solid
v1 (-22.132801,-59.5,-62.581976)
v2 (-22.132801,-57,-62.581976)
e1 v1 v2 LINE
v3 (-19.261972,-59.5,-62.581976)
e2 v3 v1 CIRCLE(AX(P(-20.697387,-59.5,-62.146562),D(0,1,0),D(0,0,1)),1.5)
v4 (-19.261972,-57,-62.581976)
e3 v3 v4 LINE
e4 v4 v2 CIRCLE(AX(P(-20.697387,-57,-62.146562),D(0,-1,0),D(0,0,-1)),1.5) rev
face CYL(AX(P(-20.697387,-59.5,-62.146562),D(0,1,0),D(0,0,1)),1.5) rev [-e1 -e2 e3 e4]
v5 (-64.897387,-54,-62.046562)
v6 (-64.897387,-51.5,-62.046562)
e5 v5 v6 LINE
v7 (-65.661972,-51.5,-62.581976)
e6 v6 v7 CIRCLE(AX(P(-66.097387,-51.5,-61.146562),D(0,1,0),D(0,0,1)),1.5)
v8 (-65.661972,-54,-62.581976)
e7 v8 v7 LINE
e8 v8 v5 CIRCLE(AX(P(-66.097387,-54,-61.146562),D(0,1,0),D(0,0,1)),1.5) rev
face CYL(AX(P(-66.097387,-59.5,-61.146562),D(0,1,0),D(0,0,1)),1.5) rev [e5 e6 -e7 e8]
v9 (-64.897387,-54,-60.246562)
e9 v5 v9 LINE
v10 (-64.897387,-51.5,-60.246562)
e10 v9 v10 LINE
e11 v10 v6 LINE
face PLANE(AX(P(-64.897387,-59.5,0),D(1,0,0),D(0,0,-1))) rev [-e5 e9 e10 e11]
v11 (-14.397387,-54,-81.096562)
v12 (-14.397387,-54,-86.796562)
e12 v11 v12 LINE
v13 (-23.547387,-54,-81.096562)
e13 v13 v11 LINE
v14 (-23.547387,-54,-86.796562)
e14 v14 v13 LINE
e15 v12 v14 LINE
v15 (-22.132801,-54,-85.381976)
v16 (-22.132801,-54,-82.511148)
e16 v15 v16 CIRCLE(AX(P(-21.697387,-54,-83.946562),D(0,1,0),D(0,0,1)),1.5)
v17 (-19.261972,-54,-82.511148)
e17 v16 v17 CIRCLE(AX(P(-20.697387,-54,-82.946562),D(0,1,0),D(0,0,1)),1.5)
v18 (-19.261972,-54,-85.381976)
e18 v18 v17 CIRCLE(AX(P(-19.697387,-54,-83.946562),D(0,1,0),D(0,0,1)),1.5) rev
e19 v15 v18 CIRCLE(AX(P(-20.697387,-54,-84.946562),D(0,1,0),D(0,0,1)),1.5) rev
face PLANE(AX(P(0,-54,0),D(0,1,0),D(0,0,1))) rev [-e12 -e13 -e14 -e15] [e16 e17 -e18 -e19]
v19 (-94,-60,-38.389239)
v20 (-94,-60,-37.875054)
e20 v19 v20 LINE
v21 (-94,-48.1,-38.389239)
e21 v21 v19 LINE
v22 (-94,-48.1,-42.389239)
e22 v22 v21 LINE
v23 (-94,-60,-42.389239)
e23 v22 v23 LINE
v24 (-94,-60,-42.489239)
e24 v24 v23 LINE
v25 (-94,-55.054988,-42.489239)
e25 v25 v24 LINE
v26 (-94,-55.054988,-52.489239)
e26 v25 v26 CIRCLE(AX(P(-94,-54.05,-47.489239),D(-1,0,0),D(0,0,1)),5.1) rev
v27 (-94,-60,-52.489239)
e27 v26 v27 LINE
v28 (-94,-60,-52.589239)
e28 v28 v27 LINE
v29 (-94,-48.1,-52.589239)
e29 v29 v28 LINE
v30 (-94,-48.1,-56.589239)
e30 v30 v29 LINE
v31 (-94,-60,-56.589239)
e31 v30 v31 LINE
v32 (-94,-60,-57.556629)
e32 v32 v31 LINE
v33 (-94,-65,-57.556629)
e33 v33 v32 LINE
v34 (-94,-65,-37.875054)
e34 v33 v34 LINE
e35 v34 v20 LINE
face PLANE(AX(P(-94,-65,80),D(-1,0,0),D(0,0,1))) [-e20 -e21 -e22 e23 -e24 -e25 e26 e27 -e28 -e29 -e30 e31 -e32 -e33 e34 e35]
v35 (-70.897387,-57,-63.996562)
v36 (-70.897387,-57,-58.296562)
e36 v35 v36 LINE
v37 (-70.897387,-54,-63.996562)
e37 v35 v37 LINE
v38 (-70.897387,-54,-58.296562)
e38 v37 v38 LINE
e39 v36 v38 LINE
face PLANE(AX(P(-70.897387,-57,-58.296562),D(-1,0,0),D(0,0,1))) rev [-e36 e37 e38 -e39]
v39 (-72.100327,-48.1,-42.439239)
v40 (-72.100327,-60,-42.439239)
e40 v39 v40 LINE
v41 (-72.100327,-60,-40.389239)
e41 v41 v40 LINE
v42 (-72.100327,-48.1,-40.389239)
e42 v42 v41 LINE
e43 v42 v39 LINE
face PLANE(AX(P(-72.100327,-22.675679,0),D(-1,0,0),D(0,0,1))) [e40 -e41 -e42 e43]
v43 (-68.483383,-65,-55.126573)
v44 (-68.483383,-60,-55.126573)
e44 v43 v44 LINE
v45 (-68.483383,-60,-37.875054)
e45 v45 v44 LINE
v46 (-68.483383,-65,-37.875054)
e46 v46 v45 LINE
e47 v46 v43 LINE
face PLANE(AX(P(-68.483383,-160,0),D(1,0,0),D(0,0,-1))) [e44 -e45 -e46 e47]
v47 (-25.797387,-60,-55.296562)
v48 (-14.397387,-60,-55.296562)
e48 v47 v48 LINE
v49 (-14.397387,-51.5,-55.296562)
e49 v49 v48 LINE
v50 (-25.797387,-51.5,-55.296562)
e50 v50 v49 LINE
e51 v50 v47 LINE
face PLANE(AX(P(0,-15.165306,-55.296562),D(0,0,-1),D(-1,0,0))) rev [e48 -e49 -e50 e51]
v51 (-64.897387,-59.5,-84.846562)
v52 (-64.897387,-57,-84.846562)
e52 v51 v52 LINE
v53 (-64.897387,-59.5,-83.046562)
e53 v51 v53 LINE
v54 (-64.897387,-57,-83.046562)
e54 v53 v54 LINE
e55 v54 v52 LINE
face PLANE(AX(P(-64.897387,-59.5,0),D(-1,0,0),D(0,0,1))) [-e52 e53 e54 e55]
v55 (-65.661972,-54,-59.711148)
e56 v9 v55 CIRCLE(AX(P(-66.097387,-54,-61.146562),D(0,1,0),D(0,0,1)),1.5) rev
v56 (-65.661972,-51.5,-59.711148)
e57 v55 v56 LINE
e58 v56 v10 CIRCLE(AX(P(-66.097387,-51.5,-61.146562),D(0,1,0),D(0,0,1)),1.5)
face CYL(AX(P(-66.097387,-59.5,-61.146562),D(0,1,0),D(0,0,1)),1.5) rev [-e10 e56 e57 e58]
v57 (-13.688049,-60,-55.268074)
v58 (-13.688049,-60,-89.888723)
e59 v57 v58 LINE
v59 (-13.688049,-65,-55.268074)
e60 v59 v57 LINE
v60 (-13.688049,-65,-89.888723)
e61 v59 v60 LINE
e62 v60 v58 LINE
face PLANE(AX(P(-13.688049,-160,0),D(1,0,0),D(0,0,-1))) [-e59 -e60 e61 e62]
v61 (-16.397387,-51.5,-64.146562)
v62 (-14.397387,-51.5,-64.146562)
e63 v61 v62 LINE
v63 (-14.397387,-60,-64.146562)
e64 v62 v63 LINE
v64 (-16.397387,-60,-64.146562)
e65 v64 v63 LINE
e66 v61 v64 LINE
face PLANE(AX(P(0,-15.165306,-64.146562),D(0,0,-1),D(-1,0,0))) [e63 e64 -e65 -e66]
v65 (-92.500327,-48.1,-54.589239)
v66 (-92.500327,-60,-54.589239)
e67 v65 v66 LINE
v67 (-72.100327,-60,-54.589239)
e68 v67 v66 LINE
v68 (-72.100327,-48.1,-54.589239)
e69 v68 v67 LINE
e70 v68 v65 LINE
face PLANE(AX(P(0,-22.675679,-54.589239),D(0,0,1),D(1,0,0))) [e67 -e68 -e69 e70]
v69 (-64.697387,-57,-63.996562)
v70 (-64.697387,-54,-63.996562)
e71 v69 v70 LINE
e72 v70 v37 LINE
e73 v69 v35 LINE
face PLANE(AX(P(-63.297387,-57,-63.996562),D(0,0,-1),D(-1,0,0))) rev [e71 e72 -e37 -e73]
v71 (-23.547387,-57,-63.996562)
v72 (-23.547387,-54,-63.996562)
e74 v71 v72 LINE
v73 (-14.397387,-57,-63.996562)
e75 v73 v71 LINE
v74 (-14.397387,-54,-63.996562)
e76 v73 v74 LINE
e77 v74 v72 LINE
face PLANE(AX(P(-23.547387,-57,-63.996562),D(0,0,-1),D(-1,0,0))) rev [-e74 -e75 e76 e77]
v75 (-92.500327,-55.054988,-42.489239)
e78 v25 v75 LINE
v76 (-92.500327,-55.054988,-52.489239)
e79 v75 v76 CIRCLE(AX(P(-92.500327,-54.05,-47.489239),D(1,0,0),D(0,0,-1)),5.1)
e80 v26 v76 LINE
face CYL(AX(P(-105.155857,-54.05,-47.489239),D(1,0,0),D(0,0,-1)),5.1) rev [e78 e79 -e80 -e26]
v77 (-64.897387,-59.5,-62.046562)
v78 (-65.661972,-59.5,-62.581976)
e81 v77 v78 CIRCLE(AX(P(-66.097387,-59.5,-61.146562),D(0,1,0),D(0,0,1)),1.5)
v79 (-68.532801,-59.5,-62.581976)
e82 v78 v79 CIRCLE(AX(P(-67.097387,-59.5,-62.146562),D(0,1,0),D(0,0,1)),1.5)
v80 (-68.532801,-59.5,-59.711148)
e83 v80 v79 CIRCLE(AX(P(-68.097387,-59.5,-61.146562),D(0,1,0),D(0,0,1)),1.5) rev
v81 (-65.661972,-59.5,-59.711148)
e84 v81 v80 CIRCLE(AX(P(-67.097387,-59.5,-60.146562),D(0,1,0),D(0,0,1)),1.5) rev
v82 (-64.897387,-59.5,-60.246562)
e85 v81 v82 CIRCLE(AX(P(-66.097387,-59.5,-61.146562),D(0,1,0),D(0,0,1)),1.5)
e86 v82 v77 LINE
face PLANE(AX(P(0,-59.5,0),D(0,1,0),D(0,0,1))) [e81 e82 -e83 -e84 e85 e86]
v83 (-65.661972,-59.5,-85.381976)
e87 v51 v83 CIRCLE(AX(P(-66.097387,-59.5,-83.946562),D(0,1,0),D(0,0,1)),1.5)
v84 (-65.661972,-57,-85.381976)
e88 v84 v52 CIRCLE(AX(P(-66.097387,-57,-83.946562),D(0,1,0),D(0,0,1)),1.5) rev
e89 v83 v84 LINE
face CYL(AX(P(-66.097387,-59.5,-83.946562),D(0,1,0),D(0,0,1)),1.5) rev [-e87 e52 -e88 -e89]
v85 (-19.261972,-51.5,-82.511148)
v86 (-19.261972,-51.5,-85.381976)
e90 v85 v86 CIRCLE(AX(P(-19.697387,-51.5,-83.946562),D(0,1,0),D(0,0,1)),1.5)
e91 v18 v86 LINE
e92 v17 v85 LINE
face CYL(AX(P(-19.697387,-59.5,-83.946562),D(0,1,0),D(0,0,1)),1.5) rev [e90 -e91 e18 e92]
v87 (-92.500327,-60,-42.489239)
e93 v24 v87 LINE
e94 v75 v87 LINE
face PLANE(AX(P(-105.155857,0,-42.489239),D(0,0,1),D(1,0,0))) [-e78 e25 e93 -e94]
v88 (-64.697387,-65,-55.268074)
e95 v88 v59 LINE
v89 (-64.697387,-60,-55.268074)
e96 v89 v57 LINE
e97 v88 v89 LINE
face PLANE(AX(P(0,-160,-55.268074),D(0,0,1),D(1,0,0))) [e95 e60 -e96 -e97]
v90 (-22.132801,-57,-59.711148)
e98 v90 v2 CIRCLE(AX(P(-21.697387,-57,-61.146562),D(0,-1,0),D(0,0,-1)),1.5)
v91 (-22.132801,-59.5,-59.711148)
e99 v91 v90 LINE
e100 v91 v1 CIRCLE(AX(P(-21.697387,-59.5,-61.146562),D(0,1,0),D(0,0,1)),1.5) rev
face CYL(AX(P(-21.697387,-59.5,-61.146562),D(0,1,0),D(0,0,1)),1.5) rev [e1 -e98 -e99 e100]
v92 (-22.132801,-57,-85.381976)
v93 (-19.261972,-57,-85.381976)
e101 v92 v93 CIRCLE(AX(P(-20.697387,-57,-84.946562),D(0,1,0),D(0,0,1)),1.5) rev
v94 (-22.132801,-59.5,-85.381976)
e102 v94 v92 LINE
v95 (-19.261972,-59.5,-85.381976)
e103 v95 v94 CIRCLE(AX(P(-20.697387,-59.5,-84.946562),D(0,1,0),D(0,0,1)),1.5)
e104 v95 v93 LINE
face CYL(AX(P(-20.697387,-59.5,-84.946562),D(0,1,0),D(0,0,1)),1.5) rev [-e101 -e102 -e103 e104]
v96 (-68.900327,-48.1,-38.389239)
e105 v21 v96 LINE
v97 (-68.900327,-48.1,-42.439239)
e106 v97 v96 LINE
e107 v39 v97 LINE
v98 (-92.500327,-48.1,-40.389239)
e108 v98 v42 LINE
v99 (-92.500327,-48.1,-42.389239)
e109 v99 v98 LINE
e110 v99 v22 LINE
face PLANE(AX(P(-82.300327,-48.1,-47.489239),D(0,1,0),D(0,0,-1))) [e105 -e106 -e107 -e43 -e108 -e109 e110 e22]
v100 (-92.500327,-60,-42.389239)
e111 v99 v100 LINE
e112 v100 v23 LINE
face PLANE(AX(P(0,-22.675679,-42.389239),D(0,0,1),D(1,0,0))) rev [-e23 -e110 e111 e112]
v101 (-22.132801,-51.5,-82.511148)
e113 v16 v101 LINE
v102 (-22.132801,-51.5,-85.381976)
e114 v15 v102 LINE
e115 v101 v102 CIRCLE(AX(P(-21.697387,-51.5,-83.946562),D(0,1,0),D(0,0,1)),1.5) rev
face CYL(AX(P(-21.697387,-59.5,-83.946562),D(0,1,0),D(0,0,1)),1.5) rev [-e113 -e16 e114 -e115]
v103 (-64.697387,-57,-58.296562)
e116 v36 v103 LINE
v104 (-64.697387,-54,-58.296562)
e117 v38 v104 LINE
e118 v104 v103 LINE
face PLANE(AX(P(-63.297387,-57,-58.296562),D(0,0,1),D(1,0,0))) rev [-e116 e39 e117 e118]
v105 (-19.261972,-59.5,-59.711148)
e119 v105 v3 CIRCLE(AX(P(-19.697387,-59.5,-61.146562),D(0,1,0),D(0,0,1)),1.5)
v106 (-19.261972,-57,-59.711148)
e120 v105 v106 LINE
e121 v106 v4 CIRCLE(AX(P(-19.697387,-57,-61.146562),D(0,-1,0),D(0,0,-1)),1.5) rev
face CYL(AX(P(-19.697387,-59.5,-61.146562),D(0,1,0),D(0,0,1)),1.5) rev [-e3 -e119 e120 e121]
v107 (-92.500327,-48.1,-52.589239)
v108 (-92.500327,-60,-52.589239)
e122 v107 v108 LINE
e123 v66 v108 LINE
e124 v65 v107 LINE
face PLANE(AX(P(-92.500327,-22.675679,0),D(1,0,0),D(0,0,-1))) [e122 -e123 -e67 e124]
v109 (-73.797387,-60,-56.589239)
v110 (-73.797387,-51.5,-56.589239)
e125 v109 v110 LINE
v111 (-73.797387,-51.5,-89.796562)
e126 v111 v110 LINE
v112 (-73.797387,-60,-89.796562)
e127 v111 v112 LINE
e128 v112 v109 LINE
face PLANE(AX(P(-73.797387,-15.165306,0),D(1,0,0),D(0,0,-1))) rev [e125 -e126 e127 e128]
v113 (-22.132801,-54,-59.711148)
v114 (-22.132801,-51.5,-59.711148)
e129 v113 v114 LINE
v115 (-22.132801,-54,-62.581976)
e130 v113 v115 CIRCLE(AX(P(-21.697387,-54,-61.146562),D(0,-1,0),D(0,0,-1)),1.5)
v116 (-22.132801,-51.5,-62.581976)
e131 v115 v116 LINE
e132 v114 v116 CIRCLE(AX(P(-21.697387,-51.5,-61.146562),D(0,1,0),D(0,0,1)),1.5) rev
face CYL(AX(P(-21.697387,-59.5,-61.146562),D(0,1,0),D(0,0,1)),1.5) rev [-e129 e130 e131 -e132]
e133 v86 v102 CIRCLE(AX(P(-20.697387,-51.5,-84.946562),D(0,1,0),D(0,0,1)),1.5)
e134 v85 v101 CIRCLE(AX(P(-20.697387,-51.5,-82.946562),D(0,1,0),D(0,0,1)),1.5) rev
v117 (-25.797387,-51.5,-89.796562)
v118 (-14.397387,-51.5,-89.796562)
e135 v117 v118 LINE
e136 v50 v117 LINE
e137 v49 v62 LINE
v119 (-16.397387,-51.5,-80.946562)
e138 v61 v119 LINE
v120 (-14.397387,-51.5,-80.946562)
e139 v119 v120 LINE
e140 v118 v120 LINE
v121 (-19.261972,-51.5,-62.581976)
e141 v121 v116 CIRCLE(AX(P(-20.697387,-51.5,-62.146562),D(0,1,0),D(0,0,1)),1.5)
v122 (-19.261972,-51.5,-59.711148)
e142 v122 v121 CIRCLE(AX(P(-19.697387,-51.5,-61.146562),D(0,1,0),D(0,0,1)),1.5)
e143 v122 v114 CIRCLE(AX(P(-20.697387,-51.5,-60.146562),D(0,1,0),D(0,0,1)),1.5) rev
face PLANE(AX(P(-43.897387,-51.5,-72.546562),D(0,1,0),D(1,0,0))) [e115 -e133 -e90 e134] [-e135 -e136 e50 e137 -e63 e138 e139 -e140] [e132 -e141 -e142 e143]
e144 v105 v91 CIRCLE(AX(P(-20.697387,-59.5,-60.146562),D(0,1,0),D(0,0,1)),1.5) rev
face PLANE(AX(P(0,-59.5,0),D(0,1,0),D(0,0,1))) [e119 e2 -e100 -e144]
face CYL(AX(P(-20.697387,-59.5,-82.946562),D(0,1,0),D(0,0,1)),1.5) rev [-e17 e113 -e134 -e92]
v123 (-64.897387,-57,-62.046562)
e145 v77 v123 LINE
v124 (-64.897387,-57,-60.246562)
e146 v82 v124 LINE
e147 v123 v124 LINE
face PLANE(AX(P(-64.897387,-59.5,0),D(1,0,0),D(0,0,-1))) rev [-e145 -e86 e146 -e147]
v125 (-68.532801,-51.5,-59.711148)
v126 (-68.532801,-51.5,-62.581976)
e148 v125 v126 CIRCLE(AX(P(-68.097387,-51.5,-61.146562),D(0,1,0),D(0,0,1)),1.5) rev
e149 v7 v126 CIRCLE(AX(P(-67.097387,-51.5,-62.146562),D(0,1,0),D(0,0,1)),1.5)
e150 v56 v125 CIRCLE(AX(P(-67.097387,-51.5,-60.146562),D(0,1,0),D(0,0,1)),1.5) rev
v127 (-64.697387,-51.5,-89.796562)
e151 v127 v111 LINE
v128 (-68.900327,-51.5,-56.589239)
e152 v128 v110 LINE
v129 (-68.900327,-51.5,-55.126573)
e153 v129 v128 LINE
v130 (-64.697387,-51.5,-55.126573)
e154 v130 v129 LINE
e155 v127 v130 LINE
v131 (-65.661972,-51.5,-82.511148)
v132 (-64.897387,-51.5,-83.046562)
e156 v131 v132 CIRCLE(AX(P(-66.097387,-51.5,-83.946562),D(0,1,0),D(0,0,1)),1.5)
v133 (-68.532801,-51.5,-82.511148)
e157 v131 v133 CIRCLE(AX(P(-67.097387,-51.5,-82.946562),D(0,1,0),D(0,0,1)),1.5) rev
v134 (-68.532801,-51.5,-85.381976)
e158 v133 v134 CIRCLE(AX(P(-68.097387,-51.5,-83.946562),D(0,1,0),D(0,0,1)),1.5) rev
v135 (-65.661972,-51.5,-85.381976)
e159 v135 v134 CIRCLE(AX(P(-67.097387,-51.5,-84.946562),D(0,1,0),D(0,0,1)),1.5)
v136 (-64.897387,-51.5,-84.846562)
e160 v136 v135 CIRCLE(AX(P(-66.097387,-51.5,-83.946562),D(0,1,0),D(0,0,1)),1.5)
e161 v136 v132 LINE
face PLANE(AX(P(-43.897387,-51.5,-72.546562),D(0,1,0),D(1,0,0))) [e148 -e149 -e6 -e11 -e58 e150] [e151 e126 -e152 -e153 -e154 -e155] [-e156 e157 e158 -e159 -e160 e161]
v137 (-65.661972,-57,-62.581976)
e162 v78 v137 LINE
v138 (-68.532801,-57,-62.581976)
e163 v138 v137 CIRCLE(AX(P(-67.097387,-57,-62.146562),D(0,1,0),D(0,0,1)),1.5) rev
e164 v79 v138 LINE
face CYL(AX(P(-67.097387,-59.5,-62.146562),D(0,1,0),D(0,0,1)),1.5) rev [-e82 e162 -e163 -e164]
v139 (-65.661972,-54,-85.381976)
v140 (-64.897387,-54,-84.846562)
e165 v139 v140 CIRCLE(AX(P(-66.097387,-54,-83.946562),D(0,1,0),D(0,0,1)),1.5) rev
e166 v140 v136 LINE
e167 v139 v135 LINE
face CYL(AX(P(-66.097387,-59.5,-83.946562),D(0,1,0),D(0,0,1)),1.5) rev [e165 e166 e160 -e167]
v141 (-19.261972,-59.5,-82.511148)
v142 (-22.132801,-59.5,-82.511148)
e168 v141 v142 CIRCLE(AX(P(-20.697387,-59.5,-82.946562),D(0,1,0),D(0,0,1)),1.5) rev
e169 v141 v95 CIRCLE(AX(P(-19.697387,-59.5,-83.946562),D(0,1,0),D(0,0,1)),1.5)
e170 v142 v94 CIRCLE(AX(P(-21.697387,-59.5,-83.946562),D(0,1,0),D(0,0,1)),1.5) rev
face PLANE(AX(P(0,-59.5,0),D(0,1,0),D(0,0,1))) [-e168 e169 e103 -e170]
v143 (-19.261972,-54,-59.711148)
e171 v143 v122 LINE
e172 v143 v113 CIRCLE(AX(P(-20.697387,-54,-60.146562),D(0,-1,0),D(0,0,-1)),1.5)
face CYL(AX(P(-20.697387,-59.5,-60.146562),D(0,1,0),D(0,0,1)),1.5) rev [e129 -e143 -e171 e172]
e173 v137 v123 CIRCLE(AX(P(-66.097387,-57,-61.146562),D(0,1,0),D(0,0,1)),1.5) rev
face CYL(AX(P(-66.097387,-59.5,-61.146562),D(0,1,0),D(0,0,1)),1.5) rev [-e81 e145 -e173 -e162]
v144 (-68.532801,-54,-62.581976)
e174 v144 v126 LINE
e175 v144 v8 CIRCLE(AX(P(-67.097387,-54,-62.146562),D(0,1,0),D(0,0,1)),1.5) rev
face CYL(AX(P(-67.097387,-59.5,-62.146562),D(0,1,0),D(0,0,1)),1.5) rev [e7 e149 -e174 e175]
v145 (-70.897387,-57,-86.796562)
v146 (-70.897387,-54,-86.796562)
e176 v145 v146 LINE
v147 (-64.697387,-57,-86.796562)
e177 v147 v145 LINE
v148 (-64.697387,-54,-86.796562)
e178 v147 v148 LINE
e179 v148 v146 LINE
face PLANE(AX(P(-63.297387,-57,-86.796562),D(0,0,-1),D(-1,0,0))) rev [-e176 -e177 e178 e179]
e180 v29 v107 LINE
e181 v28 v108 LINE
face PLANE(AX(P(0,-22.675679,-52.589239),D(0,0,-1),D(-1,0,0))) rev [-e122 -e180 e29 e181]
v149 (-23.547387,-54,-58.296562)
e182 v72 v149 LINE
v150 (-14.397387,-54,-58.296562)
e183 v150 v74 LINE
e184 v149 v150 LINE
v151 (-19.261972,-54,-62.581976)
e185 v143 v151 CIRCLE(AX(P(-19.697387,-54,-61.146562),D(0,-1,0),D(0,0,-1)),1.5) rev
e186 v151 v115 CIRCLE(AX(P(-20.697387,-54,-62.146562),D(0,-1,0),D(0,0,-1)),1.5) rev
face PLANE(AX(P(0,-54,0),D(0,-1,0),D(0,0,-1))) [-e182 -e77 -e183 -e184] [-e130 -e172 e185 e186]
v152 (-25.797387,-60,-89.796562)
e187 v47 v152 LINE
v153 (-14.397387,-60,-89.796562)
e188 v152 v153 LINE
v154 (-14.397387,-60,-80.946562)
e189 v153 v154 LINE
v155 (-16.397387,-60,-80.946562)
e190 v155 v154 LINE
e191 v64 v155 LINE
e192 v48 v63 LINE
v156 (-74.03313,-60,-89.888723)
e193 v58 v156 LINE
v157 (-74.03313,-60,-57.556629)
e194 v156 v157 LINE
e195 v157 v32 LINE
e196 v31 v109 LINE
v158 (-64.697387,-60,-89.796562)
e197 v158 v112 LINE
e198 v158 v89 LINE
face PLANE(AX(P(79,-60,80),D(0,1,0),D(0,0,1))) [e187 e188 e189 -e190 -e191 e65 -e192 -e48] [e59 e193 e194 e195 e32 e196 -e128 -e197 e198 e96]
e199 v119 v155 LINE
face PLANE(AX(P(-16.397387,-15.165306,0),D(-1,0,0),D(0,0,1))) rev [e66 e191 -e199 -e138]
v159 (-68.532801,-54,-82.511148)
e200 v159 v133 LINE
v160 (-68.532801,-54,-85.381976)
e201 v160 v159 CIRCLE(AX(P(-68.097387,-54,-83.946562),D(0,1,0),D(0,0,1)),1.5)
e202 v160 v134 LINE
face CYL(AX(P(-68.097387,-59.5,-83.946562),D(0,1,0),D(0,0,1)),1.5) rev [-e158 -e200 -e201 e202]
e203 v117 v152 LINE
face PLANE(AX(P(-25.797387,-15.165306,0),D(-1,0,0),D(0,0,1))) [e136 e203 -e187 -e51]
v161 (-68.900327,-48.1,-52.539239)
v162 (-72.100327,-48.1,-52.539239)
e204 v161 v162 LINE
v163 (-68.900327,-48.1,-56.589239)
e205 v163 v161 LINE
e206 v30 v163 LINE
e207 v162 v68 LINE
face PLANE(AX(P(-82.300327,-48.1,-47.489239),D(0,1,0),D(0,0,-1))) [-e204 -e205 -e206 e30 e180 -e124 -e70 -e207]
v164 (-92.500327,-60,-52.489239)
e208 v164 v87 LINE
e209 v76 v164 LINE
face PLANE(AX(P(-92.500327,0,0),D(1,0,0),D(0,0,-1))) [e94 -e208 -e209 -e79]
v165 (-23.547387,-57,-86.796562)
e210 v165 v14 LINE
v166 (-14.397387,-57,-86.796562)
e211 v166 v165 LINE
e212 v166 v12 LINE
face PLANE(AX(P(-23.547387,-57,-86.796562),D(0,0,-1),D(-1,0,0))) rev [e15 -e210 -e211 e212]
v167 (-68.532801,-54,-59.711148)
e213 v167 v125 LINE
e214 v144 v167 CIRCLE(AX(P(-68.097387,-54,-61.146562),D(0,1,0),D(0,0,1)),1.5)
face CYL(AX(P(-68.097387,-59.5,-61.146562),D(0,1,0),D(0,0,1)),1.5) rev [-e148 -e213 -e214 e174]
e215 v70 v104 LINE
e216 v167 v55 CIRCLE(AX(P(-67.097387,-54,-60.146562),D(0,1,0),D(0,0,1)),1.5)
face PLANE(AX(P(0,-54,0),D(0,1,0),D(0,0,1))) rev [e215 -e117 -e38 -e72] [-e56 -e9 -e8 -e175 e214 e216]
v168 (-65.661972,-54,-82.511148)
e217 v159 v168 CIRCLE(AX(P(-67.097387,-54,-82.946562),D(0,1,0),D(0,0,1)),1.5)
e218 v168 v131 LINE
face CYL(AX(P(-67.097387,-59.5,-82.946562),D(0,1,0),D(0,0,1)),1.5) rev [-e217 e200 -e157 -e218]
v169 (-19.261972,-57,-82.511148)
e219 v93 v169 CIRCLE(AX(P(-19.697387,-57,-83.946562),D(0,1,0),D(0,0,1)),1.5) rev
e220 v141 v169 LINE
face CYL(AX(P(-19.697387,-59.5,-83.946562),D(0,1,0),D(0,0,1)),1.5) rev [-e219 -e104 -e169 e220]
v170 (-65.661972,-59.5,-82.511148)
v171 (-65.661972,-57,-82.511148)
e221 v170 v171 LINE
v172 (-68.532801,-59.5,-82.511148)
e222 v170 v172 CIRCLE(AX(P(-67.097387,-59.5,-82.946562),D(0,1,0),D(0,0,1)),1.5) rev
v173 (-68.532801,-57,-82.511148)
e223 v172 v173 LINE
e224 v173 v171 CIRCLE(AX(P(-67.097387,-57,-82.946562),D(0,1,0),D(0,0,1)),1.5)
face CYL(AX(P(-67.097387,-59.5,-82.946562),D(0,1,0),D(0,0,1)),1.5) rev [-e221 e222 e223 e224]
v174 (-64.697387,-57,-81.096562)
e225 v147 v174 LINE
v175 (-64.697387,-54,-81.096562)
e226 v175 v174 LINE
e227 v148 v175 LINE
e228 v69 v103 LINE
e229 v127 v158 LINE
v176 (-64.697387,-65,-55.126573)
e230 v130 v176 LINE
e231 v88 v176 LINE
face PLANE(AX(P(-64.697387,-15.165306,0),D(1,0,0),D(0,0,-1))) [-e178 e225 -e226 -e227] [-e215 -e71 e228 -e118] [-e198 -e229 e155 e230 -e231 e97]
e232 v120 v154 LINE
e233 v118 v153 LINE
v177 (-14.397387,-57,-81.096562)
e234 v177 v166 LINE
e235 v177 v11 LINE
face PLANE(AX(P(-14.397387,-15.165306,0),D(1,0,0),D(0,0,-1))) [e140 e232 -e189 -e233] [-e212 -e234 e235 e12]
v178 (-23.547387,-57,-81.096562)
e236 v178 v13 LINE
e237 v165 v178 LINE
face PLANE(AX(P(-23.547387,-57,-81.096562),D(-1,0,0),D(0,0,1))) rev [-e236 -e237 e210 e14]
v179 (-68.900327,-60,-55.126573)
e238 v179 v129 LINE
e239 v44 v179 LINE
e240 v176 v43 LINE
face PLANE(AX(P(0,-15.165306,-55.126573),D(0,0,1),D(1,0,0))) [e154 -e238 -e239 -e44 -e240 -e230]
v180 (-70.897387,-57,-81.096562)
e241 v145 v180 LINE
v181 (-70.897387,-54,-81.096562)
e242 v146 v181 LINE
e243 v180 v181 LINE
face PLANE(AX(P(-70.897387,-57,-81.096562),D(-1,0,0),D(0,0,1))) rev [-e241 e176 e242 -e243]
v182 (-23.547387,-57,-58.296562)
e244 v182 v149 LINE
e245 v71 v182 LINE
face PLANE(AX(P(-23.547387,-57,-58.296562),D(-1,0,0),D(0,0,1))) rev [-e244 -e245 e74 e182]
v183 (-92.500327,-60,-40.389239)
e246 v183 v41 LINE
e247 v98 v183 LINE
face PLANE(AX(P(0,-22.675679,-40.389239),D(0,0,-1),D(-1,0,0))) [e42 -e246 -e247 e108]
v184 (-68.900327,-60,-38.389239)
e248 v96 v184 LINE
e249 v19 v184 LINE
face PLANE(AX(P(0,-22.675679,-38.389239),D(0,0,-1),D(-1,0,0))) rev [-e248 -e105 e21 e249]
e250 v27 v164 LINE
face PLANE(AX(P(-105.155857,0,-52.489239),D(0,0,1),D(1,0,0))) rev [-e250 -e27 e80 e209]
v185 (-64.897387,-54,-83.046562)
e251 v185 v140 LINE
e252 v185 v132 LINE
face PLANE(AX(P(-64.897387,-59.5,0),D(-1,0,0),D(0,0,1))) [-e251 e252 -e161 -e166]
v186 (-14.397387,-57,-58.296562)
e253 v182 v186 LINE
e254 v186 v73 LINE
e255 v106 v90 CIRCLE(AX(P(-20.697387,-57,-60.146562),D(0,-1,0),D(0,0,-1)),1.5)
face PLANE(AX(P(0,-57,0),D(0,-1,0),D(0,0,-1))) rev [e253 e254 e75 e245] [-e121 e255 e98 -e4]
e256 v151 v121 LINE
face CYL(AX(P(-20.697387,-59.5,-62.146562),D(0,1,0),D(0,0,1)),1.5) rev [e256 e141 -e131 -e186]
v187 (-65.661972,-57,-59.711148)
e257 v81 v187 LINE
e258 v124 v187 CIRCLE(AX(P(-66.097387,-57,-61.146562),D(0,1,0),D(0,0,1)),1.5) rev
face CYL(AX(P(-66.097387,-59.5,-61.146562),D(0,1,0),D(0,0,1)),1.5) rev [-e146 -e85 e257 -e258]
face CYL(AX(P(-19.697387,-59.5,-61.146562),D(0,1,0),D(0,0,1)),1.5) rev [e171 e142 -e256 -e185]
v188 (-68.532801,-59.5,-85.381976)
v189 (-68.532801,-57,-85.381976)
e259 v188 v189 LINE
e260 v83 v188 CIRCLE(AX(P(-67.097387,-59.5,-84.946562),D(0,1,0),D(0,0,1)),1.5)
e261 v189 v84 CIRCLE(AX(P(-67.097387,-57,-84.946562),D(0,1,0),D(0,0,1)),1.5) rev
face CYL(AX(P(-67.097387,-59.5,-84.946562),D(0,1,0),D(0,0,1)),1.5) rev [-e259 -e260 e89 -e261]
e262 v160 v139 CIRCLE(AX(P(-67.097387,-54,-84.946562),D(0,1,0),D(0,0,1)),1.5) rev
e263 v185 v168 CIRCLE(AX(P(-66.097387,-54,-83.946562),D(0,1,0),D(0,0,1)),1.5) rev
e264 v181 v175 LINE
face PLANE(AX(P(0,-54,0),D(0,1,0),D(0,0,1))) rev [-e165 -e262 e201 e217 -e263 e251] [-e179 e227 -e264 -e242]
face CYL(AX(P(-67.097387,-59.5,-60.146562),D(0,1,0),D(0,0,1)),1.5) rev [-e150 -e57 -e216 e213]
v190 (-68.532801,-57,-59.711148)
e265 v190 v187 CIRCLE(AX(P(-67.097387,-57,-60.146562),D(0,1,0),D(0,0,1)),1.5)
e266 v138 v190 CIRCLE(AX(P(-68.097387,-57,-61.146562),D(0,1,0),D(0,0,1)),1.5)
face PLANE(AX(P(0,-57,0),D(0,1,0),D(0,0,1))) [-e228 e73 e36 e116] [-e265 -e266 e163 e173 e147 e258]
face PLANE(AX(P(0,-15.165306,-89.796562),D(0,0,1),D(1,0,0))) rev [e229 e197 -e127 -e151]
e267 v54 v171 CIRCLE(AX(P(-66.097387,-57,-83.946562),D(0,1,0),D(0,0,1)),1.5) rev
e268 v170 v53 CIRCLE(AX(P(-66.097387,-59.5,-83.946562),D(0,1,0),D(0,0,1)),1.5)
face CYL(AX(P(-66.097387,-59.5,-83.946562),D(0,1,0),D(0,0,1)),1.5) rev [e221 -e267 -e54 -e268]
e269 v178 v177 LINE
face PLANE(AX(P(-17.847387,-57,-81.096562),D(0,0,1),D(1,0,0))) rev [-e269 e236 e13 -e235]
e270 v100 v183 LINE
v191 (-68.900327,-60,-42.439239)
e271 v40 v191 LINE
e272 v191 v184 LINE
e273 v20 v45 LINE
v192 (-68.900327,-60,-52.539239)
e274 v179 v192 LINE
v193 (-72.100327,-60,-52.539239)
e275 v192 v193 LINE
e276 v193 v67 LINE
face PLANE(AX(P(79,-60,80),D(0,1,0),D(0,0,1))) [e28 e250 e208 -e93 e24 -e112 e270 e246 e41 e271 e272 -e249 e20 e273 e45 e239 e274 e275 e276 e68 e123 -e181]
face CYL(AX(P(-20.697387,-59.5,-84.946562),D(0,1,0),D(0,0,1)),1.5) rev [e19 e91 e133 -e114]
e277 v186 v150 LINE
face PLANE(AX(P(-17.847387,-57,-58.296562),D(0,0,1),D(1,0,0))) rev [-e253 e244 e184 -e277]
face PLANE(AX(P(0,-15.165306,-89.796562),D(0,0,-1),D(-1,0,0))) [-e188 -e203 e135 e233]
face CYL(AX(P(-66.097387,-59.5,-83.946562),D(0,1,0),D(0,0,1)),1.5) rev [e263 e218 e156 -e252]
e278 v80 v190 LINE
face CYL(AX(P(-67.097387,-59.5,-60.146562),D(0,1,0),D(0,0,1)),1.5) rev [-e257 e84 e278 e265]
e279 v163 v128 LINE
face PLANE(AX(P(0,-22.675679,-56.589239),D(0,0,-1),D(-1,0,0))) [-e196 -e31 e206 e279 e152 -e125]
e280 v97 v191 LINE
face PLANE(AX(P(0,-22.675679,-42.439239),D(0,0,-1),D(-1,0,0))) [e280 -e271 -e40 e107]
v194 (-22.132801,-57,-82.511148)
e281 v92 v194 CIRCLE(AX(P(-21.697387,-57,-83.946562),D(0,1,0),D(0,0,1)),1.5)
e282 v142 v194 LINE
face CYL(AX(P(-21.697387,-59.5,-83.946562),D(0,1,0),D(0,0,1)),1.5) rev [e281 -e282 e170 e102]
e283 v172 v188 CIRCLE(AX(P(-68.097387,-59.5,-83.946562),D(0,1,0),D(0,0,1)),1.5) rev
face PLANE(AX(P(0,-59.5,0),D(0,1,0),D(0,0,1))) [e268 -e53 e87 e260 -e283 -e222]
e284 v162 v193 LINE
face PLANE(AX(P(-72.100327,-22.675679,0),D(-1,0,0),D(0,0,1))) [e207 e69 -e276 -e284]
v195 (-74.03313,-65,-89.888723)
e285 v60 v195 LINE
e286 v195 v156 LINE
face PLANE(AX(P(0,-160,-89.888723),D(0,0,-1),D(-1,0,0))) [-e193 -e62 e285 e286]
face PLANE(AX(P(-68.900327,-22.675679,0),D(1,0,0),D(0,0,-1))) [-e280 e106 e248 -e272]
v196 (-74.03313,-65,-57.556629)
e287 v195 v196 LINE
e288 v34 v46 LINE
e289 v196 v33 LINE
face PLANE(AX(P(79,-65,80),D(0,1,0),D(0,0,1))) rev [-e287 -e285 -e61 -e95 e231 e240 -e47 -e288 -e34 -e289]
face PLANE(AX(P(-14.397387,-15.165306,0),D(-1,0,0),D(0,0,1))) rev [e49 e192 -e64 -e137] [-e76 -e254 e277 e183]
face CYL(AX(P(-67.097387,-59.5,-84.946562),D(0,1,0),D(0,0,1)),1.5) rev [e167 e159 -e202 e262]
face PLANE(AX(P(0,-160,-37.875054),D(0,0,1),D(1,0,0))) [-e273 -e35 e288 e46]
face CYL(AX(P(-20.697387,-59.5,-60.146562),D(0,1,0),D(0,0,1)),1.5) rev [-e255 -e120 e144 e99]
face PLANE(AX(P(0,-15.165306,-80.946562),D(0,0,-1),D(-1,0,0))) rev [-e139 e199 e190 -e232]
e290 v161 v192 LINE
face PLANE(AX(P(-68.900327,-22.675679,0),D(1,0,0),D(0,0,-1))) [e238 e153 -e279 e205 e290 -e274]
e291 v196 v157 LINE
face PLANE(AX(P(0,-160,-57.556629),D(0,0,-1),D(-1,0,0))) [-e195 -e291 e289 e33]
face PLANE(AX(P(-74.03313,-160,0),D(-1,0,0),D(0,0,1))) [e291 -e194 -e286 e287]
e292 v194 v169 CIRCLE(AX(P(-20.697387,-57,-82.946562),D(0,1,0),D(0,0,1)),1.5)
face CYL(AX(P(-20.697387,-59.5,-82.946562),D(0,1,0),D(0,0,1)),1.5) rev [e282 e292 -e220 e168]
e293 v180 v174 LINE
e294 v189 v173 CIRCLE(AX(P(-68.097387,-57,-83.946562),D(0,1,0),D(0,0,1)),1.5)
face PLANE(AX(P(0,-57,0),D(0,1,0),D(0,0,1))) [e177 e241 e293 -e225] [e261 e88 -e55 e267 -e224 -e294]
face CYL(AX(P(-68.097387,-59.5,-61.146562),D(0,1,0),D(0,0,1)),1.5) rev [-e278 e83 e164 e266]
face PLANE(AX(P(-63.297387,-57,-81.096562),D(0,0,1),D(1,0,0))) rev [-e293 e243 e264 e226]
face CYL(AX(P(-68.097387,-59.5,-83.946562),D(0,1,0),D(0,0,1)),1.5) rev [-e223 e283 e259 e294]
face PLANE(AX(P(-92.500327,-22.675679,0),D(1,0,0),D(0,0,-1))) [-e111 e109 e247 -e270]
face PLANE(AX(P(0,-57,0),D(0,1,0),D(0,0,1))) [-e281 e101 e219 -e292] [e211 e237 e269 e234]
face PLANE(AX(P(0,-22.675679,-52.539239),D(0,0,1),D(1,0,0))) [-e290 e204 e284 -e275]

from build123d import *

# Parameters (mm, degrees)
BOSS_EXTRUDE3_START = -60
BOSS_EXTRUDE3_DEPTH = 5
SKETCH6_W           = 13.796901398
SKETCH6_H           = 14
SKETCH6_W_2         = 14
SKETCH6_H_2         = 16.306866668
SKETCH6_H_3         = 11.42033936
SKETCH6_W_3         = 14.889517864
SKETCH6_W_4         = 7.903270842
SKETCH6_H_4         = 11.041106068
SKETCH6_H_5         = 16.422438658
SKETCH6_H_6         = 19.310292274
SKETCH6_W_5         = 17.660118142
BOSS_EXTRUDE4_DEPTH = 37
BOSS_EXTRUDE5_DEPTH = 2
SKETCH8_R           = 1.55
CUT_EXTRUDE1_DEPTH  = 6
CUT_EXTRUDE2_START  = -2.5
CUT_EXTRUDE2_DEPTH  = 3
SKETCH10_W          = 29.9
SKETCH10_H          = 3
BOSS_EXTRUDE6_DEPTH = 3.1
SKETCH11_W          = 9.1
SKETCH11_H          = 34.669989019
BOSS_EXTRUDE7_DEPTH = 8.5
CUT_EXTRUDE3_DEPTH  = 8
CUT_EXTRUDE4_START  = -2.5
SKETCH14_W          = 7.6
SKETCH14_H          = 5.7
CUT_EXTRUDE4_DEPTH  = 3
BOSS_EXTRUDE8_DEPTH = 11.9
BOSS_EXTRUDE9_DEPTH = 1.499673419
CUT_EXTRUDE5_START  = 100
CUT_EXTRUDE5_DEPTH  = 200


with BuildPart() as part:
    # Sketch4 → Boss-Extrude3 (new body)
    with BuildSketch(Plane(origin=(0, 0, 0), x_dir=(1, 0, 0), z_dir=(0, 1, 0)).offset(BOSS_EXTRUDE3_START)):
        with BuildLine():
            Line((-79, -95), (79, -95))
            ThreePointArc((79, -95), (89.606601718, -90.606601718), (94, -80))
            Line((94, -80), (94, 80))
            ThreePointArc((94, 80), (89.606601718, 90.606601718), (79, 95))
            Line((79, 95), (-79, 95))
            ThreePointArc((-79, 95), (-89.606601718, 90.606601718), (-94, 80))
            Line((-94, 80), (-94, -80))
            ThreePointArc((-94, -80), (-89.606601718, -90.606601718), (-79, -95))
        make_face()
    extrude(amount=-BOSS_EXTRUDE3_DEPTH)

    # Sketch6 → Boss-Extrude4 (add)
    with BuildSketch(Plane(origin=(0, -60, 0), x_dir=(1, 0, 0), z_dir=(0, 1, 0))):
        with Locations((-70.8, 28.476784962)):
            Rectangle(SKETCH6_W, SKETCH6_H)
        with Locations((-39.020266387, 46.394045725)):
            Rectangle(SKETCH6_W_2, SKETCH6_H_2)
        with Locations((-7.988118752, 46.394045725)):
            Rectangle(SKETCH6_W_2, SKETCH6_H_2)
        with Locations((44.22727414, 46.394045725)):
            Rectangle(SKETCH6_W_2, SKETCH6_H_3)
        with Locations((72.6, 21.076479756)):
            Rectangle(SKETCH6_W_3, SKETCH6_H)
        with Locations((85.64, -55.06805056)):
            Rectangle(SKETCH6_W_4, SKETCH6_H)
        with Locations((57.347578499, -73.605954275)):
            Rectangle(SKETCH6_W_2, SKETCH6_H_4)
        with Locations((10.023553356, -73.605954275)):
            Rectangle(SKETCH6_W_2, SKETCH6_H_5)
        with Locations((-36.834989572, -73.605954275)):
            Rectangle(SKETCH6_W_2, SKETCH6_H_6)
        with Locations((-70.8, -52.206798888)):
            Rectangle(SKETCH6_W_5, SKETCH6_H)
    extrude(amount=BOSS_EXTRUDE4_DEPTH)

    # Sketch7 → Boss-Extrude5 (add)
    with BuildSketch(Plane(origin=(0, -23, 0), x_dir=(1, 0, 0), z_dir=(0, 1, 0))):
        Polygon((-70.8, -56.406798888), (-75, -56.406798888), (-75, -48.006798888), (-70.8, -48.006798888), (-70.8, -45.206798888), (-79.630059071, -45.206798888), (-79.630059071, -59.206798888), (-70.8, -59.206798888), align=None)
        Polygon((-41.034989572, -77.805954275), (-41.034989572, -73.605954275), (-43.834989572, -73.605954275), (-43.834989572, -83.261100412), (-29.834989572, -83.261100412), (-29.834989572, -73.605954275), (-32.634989572, -73.605954275), (-32.634989572, -77.805954275), align=None)
        Polygon((37.22727414, 46.394045725), (40.02727414, 46.394045725), (40.02727414, 50.594045725), (48.42727414, 50.594045725), (48.42727414, 46.394045725), (51.22727414, 46.394045725), (51.22727414, 52.104215405), (37.22727414, 52.104215405), align=None)
        Polygon((-14.988118752, 46.394045725), (-12.188118752, 46.394045725), (-12.188118752, 50.594045725), (-3.788118752, 50.594045725), (-3.788118752, 46.394045725), (-0.988118752, 46.394045725), (-0.988118752, 54.547479059), (-14.988118752, 54.547479059), align=None)
        Polygon((-46.020266387, 46.394045725), (-43.220266387, 46.394045725), (-43.220266387, 50.594045725), (-34.820266387, 50.594045725), (-34.820266387, 46.394045725), (-32.020266387, 46.394045725), (-32.020266387, 54.547479059), (-46.020266387, 54.547479059), align=None)
        Polygon((-70.8, 24.276784962), (-75, 24.276784962), (-75, 32.676784962), (-70.8, 32.676784962), (-70.8, 35.476784962), (-77.698450699, 35.476784962), (-77.698450699, 21.476784962), (-70.8, 21.476784962), align=None)
        Polygon((64.347578499, -73.605954275), (61.547578499, -73.605954275), (61.547578499, -77.805954275), (53.147578499, -77.805954275), (53.147578499, -73.605954275), (50.347578499, -73.605954275), (50.347578499, -79.126507309), (64.347578499, -79.126507309), align=None)
        Polygon((72.6, 25.276479756), (76.8, 25.276479756), (76.8, 16.876479756), (72.6, 16.876479756), (72.6, 14.076479756), (80.044758932, 14.076479756), (80.044758932, 28.076479756), (72.6, 28.076479756), align=None)
        Polygon((17.023553356, -73.605954275), (14.223553356, -73.605954275), (14.223553356, -77.805954275), (5.823553356, -77.805954275), (5.823553356, -73.605954275), (3.023553356, -73.605954275), (3.023553356, -81.817173604), (17.023553356, -81.817173604), align=None)
    extrude(amount=BOSS_EXTRUDE5_DEPTH)

    # Sketch8 → Cut-Extrude1 (cut)
    with BuildSketch(Plane(origin=(0, -23, 0), x_dir=(1, 0, 0), z_dir=(0, 1, 0))):
        with Locations(Location((-36.834989572, -73.605954275, 0), (0, 0, 270))):
            Circle(SKETCH8_R)
        with Locations(Location((-39.020266387, 46.394045725, 0), (0, 0, 270))):
            Circle(SKETCH8_R)
        with Locations(Location((-7.988118752, 46.394045725, 0), (0, 0, 270))):
            Circle(SKETCH8_R)
        with Locations(Location((44.22727414, 46.394045725, 0), (0, 0, 270))):
            Circle(SKETCH8_R)
        with Locations(Location((72.6, 21.076479756, 0), (0, 0, 270))):
            Circle(SKETCH8_R)
        with Locations(Location((85.64, -55.06805056, 0), (0, 0, 270))):
            Circle(SKETCH8_R)
        with Locations(Location((57.347578499, -73.605954275, 0), (0, 0, 270))):
            Circle(SKETCH8_R)
        with Locations(Location((10.023553356, -73.605954275, 0), (0, 0, 270))):
            Circle(SKETCH8_R)
        with Locations(Location((-70.8, -52.206798888, 0), (0, 0, 270))):
            Circle(SKETCH8_R)
        with Locations(Location((-70.8, 28.476784962, 0), (0, 0, 270))):
            Circle(SKETCH8_R)
    extrude(amount=-CUT_EXTRUDE1_DEPTH, mode=Mode.SUBTRACT)

    # Sketch9 → Cut-Extrude2 (cut)
    with BuildSketch(Plane(origin=(0, -23, 0), x_dir=(1, 0, 0), z_dir=(0, 1, 0)).offset(CUT_EXTRUDE2_START)):
        Polygon((-73.65, 25.626784962), (-73.65, 31.326784962), (-67.95, 31.326784962), (-67.95, 25.626784962), (-67.95, 21.476784962), (-73.65, 21.476784962), align=None)
        Polygon((-41.870266387, 43.544045725), (-41.870266387, 49.244045725), (-41.870266387, 54.547479059), (-36.170266387, 54.547479059), (-36.170266387, 49.244045725), (-36.170266387, 43.544045725), align=None)
        Polygon((-10.838118752, 43.544045725), (-10.838118752, 49.244045725), (-10.838118752, 54.547479059), (-5.138118752, 54.547479059), (-5.138118752, 49.244045725), (-5.138118752, 43.544045725), align=None)
        Polygon((41.37727414, 43.544045725), (41.37727414, 49.244045725), (41.37727414, 52.104215405), (47.07727414, 52.104215405), (47.07727414, 49.244045725), (47.07727414, 43.544045725), align=None)
        Polygon((69.75, 18.226479756), (69.75, 23.926479756), (69.75, 28.076479756), (75.45, 28.076479756), (75.45, 23.926479756), (75.45, 18.226479756), align=None)
        Polygon((82.79, -57.91805056), (82.79, -52.21805056), (88.49, -52.21805056), (88.49, -57.91805056), (88.49, -62.06805056), (82.79, -62.06805056), align=None)
        Polygon((54.497578499, -76.455954275), (54.497578499, -70.755954275), (60.197578499, -70.755954275), (60.197578499, -76.455954275), (60.197578499, -79.126507309), (54.497578499, -79.126507309), align=None)
        Polygon((7.173553356, -76.455954275), (7.173553356, -70.755954275), (12.873553356, -70.755954275), (17.023553356, -70.755954275), (17.023553356, -76.455954275), (12.873553356, -76.455954275), align=None)
        Polygon((-39.684989572, -70.755954275), (-33.984989572, -70.755954275), (-33.984989572, -76.455954275), (-39.684989572, -76.455954275), (-43.834989572, -76.455954275), (-43.834989572, -70.755954275), align=None)
        Polygon((-73.65, -55.056798888), (-73.65, -49.356798888), (-73.65, -45.206798888), (-67.95, -45.206798888), (-67.95, -49.356798888), (-67.95, -55.056798888), align=None)
    extrude(amount=-CUT_EXTRUDE2_DEPTH, mode=Mode.SUBTRACT)

    # Sketch10 → Boss-Extrude6 (add)
    with BuildSketch(Plane(origin=(0, -60, 0), x_dir=(1, 0, 0), z_dir=(0, 1, 0))):
        Polygon((-55.431481691, 41.136880013), (-55.431481691, 38.136880013), (-25.531481691, 38.136880013), (-25.531481691, 41.136880013), (-32.020266387, 41.136880013), (-32.020266387, 38.240612391), (-46.020266387, 38.240612391), (-46.020266387, 41.136880013), align=None)
        with Locations((-40.481481691, 18.236880013)):
            Rectangle(SKETCH10_W, SKETCH10_H)
    extrude(amount=BOSS_EXTRUDE6_DEPTH)

    # Sketch11 → Boss-Extrude7 (add)
    with BuildSketch(Plane(origin=(0, -60, 0), x_dir=(1, 0, 0), z_dir=(0, 1, 0))):
        Polygon((-25.797386747, 55.296562101), (-14.397386747, 55.296562101), (-14.397386747, 64.146562101), (-16.397386747, 64.146562101), (-16.397386747, 80.946562101), (-14.397386747, 80.946562101), (-14.397386747, 89.796562101), (-25.797386747, 89.796562101), align=None)
        with Locations((-69.247386747, 72.461567591)):
            Rectangle(SKETCH11_W, SKETCH11_H)
    extrude(amount=BOSS_EXTRUDE7_DEPTH)

    # Sketch12 → Cut-Extrude3 (cut)
    with BuildSketch(Plane(origin=(0, -51.5, 0), x_dir=(1, 0, 0), z_dir=(0, 1, 0))):
        with BuildLine():
            ThreePointArc((-65.661972401, 82.511147754), (-65.236972805, 82.717868547), (-64.897386747, 83.046562101))
            Line((-64.897386747, 83.046562101), (-64.897386747, 84.846562101))
            ThreePointArc((-64.897386747, 84.846562101), (-65.236972805, 85.175255654), (-65.661972401, 85.381976447))
            ThreePointArc((-65.661972401, 85.381976447), (-67.097386747, 86.446562101), (-68.532801094, 85.381976447))
            ThreePointArc((-68.532801094, 85.381976447), (-69.597386747, 83.946562101), (-68.532801094, 82.511147754))
            ThreePointArc((-68.532801094, 82.511147754), (-67.097386747, 81.446562101), (-65.661972401, 82.511147754))
        make_face()
        with BuildLine():
            ThreePointArc((-19.261972401, 82.511147754), (-18.197386747, 83.946562101), (-19.261972401, 85.381976447))
            ThreePointArc((-19.261972401, 85.381976447), (-20.697386747, 86.446562101), (-22.132801094, 85.381976447))
            ThreePointArc((-22.132801094, 85.381976447), (-23.197386747, 83.946562101), (-22.132801094, 82.511147754))
            ThreePointArc((-22.132801094, 82.511147754), (-20.697386747, 81.446562101), (-19.261972401, 82.511147754))
        make_face()
        with BuildLine():
            ThreePointArc((-19.261972401, 59.711147754), (-18.197386747, 61.146562101), (-19.261972401, 62.581976447))
            ThreePointArc((-19.261972401, 62.581976447), (-20.697386747, 63.646562101), (-22.132801094, 62.581976447))
            ThreePointArc((-22.132801094, 62.581976447), (-23.197386747, 61.146562101), (-22.132801094, 59.711147754))
            ThreePointArc((-22.132801094, 59.711147754), (-20.697386747, 58.646562101), (-19.261972401, 59.711147754))
        make_face()
        with BuildLine():
            ThreePointArc((-65.661972401, 59.711147754), (-65.236972805, 59.917868547), (-64.897386747, 60.246562101))
            Line((-64.897386747, 60.246562101), (-64.897386747, 62.046562101))
            ThreePointArc((-64.897386747, 62.046562101), (-65.236972805, 62.375255654), (-65.661972401, 62.581976447))
            ThreePointArc((-65.661972401, 62.581976447), (-67.097386747, 63.646562101), (-68.532801094, 62.581976447))
            ThreePointArc((-68.532801094, 62.581976447), (-69.597386747, 61.146562101), (-68.532801094, 59.711147754))
            ThreePointArc((-68.532801094, 59.711147754), (-67.097386747, 58.646562101), (-65.661972401, 59.711147754))
        make_face()
    extrude(amount=-CUT_EXTRUDE3_DEPTH, mode=Mode.SUBTRACT)

    # Sketch14 → Cut-Extrude4 (cut)
    with BuildSketch(Plane(origin=(0, -51.5, 0), x_dir=(1, 0, 0), z_dir=(0, 1, 0)).offset(CUT_EXTRUDE4_START)):
        with Locations((-67.097386747, 83.946562101)):
            Rectangle(SKETCH14_W, SKETCH14_H)
        with Locations((-67.097386747, 61.146562101)):
            Rectangle(SKETCH14_W, SKETCH14_H)
        Polygon((-23.547386747, 81.096562101), (-17.847386747, 81.096562101), (-14.397386747, 81.096562101), (-14.397386747, 86.796562101), (-17.847386747, 86.796562101), (-23.547386747, 86.796562101), align=None)
        Polygon((-23.547386747, 58.296562101), (-17.847386747, 58.296562101), (-14.397386747, 58.296562101), (-14.397386747, 63.996562101), (-17.847386747, 63.996562101), (-23.547386747, 63.996562101), align=None)
    extrude(amount=-CUT_EXTRUDE4_DEPTH, mode=Mode.SUBTRACT)

    # Sketch15 → Boss-Extrude8 (add)
    with BuildSketch(Plane(origin=(0, -60, 0), x_dir=(1, 0, 0), z_dir=(0, 1, 0))):
        Polygon((-94, 52.589239073), (-92.500326581, 52.589239073), (-92.500326581, 54.589239073), (-72.100326581, 54.589239073), (-72.100326581, 52.539239073), (-68.900326581, 52.539239073), (-68.900326581, 56.589239073), (-94, 56.589239073), align=None)
        Polygon((-92.500326581, 40.389239073), (-92.500326581, 42.389239073), (-94, 42.389239073), (-94, 38.389239073), (-68.900326581, 38.389239073), (-68.900326581, 42.439239073), (-72.100326581, 42.439239073), (-72.100326581, 40.389239073), align=None)
    extrude(amount=BOSS_EXTRUDE8_DEPTH)

    # Sketch16 → Boss-Extrude9 (add)
    with BuildSketch(Plane(origin=(-92.500326581, 0, 0), x_dir=(0, 0, -1), z_dir=(1, 0, 0))):
        with BuildLine():
            Line((42.489239073, -60), (52.489239073, -60))
            Line((52.489239073, -60), (52.489239073, -55.054987562))
            ThreePointArc((52.489239073, -55.054987562), (47.489239073, -59.15), (42.489239073, -55.054987562))
            Line((42.489239073, -55.054987562), (42.489239073, -60))
        make_face()
    extrude(amount=-BOSS_EXTRUDE9_DEPTH)

    # Sketch17 → Cut-Extrude5 (cut)
    with BuildSketch(Plane(origin=(0, -60, 0), x_dir=(1, 0, 0), z_dir=(0, 1, 0)).offset(CUT_EXTRUDE5_START)):
        with BuildLine():
            Line((-68.483383313, 37.875054154), (-94, 37.875054154))
            Line((-94, 37.875054154), (-94, -80))
            ThreePointArc((-94, -80), (-89.606601718, -90.606601718), (-79, -95))
            Line((-79, -95), (79, -95))
            ThreePointArc((79, -95), (89.606601718, -90.606601718), (94, -80))
            Line((94, -80), (94, 80))
            ThreePointArc((94, 80), (89.606601718, 90.606601718), (79, 95))
            Line((79, 95), (-79, 95))
            ThreePointArc((-79, 95), (-89.606601718, 90.606601718), (-94, 80))
            Line((-94, 80), (-94, 57.556628821))
            Line((-94, 57.556628821), (-74.033129658, 57.556628821))
            Line((-74.033129658, 57.556628821), (-74.033129658, 89.888723267))
            Line((-74.033129658, 89.888723267), (-13.688048595, 89.888723267))
            Line((-13.688048595, 89.888723267), (-13.688048595, 55.268073627))
            Line((-13.688048595, 55.268073627), (-64.697386747, 55.268073627))
            Line((-64.697386747, 55.268073627), (-64.697386747, 55.126573082))
            Line((-64.697386747, 55.126573082), (-68.483383313, 55.126573082))
            Line((-68.483383313, 55.126573082), (-68.483383313, 37.875054154))
        make_face()
    extrude(amount=-CUT_EXTRUDE5_DEPTH, mode=Mode.SUBTRACT)


solid = part.part
